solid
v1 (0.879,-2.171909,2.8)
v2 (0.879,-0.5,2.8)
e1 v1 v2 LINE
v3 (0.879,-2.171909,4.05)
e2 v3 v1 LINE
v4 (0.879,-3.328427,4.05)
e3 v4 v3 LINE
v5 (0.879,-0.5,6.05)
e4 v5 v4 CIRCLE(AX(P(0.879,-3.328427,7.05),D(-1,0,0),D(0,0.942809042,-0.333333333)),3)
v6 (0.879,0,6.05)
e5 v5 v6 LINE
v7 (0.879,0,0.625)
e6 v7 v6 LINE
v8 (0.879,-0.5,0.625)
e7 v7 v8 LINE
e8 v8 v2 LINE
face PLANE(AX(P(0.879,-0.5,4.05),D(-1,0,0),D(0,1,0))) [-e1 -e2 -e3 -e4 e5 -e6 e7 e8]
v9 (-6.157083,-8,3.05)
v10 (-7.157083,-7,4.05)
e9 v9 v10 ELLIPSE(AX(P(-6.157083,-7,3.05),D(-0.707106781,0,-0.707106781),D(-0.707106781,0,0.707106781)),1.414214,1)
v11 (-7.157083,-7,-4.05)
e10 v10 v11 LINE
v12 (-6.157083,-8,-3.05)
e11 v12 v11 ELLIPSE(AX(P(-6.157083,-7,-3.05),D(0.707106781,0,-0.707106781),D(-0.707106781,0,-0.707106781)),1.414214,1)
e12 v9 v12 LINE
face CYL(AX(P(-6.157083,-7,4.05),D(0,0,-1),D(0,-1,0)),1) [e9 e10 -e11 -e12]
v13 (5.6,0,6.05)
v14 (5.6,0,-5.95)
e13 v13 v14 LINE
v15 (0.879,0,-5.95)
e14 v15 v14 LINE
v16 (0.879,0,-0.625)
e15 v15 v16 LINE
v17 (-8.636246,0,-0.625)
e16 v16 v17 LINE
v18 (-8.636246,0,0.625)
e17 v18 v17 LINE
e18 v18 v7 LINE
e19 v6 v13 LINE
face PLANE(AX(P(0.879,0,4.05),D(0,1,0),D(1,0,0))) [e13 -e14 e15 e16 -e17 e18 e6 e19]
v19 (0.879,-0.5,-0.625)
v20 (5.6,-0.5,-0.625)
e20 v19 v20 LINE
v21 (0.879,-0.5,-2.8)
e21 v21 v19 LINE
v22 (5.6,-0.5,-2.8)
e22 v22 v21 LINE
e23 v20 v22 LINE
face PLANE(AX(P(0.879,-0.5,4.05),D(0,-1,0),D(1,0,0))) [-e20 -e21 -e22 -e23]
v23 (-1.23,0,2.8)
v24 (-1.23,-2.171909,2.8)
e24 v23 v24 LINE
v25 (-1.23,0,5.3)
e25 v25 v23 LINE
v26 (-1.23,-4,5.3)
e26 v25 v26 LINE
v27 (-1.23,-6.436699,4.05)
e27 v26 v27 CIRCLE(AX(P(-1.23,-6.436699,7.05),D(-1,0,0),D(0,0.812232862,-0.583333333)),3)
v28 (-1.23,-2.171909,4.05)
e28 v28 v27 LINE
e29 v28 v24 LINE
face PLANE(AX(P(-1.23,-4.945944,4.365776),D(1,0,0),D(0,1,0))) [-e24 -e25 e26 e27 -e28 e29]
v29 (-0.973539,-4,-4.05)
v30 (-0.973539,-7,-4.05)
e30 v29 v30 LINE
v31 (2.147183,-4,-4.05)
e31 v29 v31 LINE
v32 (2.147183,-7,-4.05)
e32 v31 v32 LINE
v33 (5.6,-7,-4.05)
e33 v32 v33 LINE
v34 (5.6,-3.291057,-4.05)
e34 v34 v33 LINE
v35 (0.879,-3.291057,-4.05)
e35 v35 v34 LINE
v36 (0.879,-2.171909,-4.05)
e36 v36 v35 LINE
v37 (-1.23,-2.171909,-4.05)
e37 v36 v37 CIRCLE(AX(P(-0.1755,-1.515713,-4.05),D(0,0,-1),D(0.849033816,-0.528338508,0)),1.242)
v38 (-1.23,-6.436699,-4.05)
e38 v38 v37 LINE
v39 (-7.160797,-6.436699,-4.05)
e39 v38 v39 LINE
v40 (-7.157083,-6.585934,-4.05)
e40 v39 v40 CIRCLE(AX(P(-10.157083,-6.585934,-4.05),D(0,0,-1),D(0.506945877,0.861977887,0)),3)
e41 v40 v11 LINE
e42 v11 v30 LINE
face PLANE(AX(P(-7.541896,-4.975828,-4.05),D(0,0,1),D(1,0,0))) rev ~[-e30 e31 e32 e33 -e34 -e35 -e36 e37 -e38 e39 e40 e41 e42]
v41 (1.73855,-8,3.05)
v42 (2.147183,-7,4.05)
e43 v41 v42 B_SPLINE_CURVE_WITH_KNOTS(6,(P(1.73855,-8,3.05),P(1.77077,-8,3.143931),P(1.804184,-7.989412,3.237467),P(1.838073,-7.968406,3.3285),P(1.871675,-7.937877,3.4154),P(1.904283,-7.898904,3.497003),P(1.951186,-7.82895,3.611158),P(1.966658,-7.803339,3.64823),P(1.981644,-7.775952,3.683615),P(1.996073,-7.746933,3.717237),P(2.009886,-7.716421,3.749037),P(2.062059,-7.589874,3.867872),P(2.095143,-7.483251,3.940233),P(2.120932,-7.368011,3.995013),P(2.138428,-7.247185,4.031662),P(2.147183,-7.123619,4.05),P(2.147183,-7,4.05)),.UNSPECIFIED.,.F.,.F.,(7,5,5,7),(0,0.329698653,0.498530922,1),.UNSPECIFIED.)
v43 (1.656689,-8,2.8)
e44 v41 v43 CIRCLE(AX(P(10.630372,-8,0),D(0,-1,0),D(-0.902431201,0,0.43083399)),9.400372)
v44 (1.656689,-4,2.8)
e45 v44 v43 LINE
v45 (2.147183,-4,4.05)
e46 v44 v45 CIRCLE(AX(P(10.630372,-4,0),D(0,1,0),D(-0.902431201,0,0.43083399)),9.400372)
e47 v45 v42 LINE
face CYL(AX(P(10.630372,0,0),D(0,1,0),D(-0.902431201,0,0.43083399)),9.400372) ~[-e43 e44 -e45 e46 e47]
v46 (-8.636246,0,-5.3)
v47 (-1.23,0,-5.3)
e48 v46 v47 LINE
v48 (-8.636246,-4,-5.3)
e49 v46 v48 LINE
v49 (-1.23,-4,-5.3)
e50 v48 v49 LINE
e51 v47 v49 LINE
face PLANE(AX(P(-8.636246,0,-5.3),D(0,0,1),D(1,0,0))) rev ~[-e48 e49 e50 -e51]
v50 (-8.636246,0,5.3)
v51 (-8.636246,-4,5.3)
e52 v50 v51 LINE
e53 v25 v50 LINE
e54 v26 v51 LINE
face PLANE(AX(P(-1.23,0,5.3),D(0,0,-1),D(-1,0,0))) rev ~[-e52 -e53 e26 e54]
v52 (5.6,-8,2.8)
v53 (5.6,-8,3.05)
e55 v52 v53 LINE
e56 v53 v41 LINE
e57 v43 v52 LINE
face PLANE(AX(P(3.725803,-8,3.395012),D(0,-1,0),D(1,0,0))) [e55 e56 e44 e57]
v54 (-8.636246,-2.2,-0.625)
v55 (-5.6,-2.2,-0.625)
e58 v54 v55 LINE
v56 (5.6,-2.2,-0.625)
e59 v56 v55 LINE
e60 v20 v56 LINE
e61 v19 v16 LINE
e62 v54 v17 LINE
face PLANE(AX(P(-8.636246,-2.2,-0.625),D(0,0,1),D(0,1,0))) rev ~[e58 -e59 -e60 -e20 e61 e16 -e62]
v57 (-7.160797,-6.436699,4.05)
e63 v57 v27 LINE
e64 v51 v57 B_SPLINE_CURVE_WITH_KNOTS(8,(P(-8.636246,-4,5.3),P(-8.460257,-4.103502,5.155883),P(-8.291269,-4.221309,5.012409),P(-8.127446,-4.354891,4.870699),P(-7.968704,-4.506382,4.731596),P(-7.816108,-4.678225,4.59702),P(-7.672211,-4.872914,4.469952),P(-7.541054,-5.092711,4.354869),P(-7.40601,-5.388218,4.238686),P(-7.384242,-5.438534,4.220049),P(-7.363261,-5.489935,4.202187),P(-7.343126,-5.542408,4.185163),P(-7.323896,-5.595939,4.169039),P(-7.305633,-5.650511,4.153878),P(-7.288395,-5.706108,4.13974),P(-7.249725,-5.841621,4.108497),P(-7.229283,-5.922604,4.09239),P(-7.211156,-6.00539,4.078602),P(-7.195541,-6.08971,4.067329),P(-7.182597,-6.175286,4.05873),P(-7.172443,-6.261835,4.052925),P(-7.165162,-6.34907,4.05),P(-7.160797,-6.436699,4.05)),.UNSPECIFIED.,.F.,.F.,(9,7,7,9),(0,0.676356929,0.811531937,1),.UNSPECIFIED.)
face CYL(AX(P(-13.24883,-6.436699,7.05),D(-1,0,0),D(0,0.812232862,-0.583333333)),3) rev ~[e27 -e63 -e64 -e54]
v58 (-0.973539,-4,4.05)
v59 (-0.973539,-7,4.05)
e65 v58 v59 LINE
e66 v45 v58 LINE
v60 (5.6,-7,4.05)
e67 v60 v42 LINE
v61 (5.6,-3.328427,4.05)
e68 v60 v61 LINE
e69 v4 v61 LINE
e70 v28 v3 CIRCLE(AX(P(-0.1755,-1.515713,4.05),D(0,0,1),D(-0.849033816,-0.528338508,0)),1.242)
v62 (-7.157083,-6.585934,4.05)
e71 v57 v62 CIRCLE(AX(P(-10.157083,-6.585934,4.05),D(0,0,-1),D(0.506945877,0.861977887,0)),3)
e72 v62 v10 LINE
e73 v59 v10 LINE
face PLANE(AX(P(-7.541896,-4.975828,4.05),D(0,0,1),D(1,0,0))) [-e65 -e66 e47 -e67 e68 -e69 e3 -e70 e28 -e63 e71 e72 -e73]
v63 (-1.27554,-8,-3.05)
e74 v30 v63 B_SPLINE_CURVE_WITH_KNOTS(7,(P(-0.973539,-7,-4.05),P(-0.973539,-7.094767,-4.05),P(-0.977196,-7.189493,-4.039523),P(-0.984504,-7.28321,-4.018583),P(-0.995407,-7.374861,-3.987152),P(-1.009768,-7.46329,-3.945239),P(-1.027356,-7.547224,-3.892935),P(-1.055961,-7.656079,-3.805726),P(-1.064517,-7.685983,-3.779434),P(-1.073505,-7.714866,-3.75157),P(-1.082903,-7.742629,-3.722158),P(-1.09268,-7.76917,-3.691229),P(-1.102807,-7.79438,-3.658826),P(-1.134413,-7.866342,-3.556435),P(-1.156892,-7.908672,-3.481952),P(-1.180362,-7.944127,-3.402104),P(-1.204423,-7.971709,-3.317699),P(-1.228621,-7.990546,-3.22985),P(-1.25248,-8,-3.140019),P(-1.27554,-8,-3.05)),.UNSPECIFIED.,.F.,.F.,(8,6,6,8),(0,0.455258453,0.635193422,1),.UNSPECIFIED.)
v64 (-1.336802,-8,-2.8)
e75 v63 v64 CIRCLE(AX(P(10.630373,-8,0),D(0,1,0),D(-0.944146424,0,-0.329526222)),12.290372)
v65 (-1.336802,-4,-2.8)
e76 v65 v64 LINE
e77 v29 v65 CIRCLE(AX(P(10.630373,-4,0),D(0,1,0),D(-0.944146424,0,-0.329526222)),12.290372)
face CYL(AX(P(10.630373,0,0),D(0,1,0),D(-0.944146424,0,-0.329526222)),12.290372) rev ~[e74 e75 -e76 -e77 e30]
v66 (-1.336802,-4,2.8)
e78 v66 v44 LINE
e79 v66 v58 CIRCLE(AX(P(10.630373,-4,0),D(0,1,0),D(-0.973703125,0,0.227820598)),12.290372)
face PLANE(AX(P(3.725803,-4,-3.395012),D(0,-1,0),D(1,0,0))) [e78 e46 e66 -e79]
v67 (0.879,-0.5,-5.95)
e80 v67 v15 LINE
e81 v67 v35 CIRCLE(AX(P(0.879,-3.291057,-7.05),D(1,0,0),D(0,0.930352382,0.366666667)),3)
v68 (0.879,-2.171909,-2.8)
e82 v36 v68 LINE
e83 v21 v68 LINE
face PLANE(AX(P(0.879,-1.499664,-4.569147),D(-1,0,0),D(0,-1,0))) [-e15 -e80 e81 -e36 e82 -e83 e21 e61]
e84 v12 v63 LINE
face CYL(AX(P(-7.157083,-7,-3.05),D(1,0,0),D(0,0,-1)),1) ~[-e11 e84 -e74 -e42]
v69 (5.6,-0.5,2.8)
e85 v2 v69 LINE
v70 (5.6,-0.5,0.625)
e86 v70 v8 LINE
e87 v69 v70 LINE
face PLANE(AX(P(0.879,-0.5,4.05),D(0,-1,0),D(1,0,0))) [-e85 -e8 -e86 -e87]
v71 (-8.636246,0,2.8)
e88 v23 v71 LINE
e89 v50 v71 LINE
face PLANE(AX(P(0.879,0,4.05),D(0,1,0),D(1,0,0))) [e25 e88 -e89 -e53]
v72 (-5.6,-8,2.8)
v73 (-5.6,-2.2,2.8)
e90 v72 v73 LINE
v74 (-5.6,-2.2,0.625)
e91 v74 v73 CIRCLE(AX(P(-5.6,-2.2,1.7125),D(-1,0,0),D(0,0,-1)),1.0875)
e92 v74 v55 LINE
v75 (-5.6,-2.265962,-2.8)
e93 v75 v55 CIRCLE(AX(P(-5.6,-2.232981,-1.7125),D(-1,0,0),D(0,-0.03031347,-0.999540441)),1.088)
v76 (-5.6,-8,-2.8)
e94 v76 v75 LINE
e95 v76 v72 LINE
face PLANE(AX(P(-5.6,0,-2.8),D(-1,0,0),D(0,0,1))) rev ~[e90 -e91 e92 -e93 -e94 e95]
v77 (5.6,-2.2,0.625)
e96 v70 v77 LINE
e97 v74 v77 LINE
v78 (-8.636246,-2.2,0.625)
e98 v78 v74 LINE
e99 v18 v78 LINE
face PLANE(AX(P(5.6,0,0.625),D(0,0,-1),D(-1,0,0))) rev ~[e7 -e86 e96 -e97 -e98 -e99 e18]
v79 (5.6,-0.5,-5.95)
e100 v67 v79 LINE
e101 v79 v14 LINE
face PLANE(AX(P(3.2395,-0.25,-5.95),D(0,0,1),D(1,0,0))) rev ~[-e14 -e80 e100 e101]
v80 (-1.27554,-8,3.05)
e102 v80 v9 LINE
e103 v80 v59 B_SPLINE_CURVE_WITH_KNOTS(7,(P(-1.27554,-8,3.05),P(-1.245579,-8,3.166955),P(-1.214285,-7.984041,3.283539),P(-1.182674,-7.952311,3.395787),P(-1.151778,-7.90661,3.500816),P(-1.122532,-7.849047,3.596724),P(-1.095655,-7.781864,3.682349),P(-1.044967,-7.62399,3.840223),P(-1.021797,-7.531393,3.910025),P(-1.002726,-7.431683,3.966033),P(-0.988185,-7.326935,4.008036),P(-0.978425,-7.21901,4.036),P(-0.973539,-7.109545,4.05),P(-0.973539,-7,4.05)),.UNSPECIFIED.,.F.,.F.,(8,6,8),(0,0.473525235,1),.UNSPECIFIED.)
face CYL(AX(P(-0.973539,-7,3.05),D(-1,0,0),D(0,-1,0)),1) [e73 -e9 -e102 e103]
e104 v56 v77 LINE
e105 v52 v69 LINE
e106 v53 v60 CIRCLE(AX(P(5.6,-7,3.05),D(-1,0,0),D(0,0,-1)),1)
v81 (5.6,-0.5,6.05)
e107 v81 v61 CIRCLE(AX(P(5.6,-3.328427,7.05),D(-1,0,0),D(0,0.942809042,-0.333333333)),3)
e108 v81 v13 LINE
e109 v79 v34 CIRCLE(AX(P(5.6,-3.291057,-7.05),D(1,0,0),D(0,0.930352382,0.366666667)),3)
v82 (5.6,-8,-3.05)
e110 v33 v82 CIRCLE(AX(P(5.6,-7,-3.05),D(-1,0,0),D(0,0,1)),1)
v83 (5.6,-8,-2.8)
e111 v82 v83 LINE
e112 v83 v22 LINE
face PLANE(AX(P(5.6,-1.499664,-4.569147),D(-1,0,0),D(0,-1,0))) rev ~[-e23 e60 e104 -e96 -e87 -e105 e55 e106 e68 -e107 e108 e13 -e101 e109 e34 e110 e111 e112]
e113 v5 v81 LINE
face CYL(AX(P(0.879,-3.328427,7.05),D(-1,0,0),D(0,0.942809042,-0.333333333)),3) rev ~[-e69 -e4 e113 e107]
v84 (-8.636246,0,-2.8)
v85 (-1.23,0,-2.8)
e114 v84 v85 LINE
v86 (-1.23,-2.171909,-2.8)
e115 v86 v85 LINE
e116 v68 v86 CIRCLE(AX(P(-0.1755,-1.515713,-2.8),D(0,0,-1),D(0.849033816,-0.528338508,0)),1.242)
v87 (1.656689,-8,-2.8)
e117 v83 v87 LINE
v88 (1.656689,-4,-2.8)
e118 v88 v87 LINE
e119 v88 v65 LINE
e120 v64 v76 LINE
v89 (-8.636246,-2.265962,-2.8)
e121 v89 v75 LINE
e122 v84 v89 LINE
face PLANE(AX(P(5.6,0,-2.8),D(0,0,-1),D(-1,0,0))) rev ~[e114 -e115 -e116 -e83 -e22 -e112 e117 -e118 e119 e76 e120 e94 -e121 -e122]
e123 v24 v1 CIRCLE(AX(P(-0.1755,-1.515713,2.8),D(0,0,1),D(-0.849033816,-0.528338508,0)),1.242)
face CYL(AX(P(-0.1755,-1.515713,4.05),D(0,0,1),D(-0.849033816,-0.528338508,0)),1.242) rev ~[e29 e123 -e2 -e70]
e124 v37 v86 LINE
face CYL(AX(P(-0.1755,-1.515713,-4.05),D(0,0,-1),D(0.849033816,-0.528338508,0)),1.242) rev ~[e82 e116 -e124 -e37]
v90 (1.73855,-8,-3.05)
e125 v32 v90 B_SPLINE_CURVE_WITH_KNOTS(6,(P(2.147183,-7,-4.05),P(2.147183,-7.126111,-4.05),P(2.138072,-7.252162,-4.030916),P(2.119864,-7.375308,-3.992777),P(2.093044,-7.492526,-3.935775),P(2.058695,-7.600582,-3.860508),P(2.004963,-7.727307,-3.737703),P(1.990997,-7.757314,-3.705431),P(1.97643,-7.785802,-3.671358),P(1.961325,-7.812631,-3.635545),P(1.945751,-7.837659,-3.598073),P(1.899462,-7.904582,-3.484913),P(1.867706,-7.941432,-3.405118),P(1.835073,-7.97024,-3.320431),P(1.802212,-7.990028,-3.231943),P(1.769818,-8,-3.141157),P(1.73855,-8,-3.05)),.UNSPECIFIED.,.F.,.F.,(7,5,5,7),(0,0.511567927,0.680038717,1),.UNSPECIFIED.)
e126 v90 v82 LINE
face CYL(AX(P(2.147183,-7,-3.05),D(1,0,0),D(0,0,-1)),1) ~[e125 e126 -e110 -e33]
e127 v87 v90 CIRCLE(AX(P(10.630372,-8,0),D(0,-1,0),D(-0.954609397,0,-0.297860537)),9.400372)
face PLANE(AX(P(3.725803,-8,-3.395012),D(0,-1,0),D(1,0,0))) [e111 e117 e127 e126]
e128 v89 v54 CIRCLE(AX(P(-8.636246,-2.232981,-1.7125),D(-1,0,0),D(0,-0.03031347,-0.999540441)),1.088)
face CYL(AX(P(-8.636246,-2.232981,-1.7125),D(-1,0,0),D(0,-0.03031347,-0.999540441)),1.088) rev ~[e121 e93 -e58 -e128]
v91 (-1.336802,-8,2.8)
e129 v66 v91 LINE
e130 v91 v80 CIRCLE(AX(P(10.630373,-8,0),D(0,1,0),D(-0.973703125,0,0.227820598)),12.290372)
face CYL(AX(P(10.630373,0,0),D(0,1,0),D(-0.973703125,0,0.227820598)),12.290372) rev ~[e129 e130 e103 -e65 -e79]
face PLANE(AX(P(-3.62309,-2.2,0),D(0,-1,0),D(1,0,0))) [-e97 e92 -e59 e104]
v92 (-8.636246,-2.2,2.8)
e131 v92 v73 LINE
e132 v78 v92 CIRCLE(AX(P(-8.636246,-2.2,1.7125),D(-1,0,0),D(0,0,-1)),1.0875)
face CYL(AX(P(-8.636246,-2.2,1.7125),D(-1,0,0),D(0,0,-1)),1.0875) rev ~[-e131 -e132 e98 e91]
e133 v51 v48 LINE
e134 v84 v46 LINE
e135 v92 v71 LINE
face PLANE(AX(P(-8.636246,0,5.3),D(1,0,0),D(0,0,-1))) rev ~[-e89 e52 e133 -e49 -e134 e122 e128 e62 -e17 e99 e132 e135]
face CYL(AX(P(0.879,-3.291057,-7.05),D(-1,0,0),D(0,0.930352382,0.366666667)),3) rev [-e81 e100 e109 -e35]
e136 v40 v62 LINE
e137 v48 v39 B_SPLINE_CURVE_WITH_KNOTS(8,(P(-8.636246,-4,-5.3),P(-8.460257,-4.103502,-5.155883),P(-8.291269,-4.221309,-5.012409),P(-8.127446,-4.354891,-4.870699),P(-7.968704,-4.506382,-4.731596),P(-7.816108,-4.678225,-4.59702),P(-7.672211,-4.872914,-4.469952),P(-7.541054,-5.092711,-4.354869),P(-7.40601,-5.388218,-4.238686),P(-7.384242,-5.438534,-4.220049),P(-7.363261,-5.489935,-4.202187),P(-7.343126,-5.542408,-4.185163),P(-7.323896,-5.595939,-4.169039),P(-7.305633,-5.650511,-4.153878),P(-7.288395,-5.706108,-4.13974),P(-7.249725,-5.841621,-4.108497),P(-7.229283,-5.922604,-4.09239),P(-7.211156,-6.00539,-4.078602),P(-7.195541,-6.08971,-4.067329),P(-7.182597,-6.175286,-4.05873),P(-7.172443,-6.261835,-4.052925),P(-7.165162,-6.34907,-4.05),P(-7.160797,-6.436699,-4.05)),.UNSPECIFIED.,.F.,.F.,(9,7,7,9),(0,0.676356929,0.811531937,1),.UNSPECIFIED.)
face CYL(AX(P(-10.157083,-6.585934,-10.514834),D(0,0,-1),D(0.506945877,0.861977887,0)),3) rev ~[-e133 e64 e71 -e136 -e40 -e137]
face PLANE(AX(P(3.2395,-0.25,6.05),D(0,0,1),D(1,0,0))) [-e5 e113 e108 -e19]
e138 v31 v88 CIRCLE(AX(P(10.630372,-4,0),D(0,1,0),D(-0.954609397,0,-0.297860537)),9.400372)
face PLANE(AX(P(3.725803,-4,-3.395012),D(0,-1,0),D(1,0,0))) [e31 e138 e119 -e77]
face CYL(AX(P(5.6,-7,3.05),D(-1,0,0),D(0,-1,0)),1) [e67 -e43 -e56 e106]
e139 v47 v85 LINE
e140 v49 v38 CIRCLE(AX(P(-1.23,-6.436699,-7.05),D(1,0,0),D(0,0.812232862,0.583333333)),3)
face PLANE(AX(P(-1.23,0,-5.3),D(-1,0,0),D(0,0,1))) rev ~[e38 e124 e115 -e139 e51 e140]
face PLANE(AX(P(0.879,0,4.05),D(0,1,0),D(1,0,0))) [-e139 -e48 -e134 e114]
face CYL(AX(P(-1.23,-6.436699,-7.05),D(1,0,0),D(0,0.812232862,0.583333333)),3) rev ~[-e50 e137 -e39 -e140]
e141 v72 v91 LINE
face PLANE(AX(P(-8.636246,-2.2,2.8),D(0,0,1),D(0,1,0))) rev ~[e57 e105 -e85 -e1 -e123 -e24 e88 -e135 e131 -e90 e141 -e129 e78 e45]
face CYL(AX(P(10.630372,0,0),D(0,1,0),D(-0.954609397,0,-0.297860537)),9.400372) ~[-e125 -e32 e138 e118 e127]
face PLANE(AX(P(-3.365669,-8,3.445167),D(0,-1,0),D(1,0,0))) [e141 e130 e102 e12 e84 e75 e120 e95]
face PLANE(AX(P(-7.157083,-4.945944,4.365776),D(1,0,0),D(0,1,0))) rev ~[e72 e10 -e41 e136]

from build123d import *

# Parameters (mm, degrees)
F1_DEPTH      = 2.2
F2_DEPTH      = 4
F3_DEPTH      = 8
F5_W          = 4.721
F5_H          = 0.5
F6_DEPTH      = 2
F6_DEPTH_BACK = 10
F7_DEPTH      = 4
F8_T1_DEPTH   = 5.9270831351
F8_T3_DEPTH   = 8.1
F8_T5_DEPTH   = 4.721
F8_T11_DEPTH  = 12.0188296006
F8_T16_DEPTH  = 14.5648341529
F8_T24_DEPTH  = 14.5648341529
F8_T29_DEPTH  = 12.0188296006
F10_DEPTH     = 1.5
F12_DEPTH     = 2
F13_R         = 1


# Not quite as in the source:
# - a fillet or chamfer that OpenCascade refuses, or shapes differently, is made with other operations: its cross-section is extruded or revolved along the edge and cut away or added


with BuildPart() as f1:
    # F0 (on Front) → F1 (new body)
    with BuildSketch(Plane.XZ):
        with BuildLine():
            Line((-1.6440981598, 0.625), (-5.6, 0.625))
            Line((-5.6, 0.625), (-5.6, -0.625))
            Line((-5.6, -0.625), (-1.6440981598, -0.625))
            ThreePointArc((-1.6440981598, -0.625), (-1.6599999508, 0), (-1.6440981598, 0.625))
        make_face()
        with BuildLine():
            Line((-1.23, 0.625), (-1.6440981598, 0.625))
            ThreePointArc((-1.6440981598, 0.625), (-1.6599999508, 0), (-1.6440981598, -0.625))
            Line((-1.6440981598, -0.625), (-1.23, -0.625))
            Line((-1.23, -0.625), (1.2508001143, -0.625))
            ThreePointArc((1.2508001143, -0.625), (1.23, 0), (1.2508001143, 0.625))
            Line((1.2508001143, 0.625), (-1.23, 0.625))
        make_face()
        with BuildLine():
            Line((1.6420518568, 0.625), (1.2508001143, 0.625))
            ThreePointArc((1.2508001143, 0.625), (1.23, 0), (1.2508001143, -0.625))
            Line((1.2508001143, -0.625), (1.6420518568, -0.625))
            Line((1.6420518568, -0.625), (5.6, -0.625))
            Line((5.6, -0.625), (5.6, 0.625))
            Line((5.6, 0.625), (1.6420518568, 0.625))
        make_face()
    extrude(amount=F1_DEPTH)

    # F0 (on Front) → F2 (join)
    with BuildSketch(Plane.XZ):
        with BuildLine():
            Line((5.6, -2.8), (1.6566885771, -2.8))
            ThreePointArc((1.6566885771, -2.8), (1.8795878526, -3.4337692421), (2.1471830551, -4.05))
            Line((2.1471830551, -4.05), (5.6, -4.05))
            Line((5.6, -4.05), (5.6, -2.8))
        make_face()
        with BuildLine():
            Line((-1.23, -2.8), (-1.3368015602, -2.8))
            ThreePointArc((-1.3368015602, -2.8), (-1.1717307029, -3.4298126738), (-0.9735386938, -4.05))
            Line((-0.9735386938, -4.05), (0.8789681604, -4.05))
            Line((0.8789681604, -4.05), (2.1471830551, -4.05))
            ThreePointArc((2.1471830551, -4.05), (1.8795878526, -3.4337692421), (1.6566885771, -2.8))
            Line((1.6566885771, -2.8), (1.23, -2.8))
            Line((1.23, -2.8), (-1.23, -2.8))
        make_face()
        with BuildLine():
            Line((-1.735931594, -2.8), (-5.6, -2.8))
            Line((-5.6, -2.8), (-5.6, -4.05))
            Line((-5.6, -4.05), (-2.3307385194, -4.05))
            Line((-2.3307385194, -4.05), (-1.23, -4.05))
            Line((-1.23, -4.05), (-0.9735386938, -4.05))
            ThreePointArc((-0.9735386938, -4.05), (-1.1717307029, -3.4298126738), (-1.3368015602, -2.8))
            Line((-1.3368015602, -2.8), (-1.735931594, -2.8))
        make_face()
        Polygon((-7.1570831351, 4.05), (-5.6, 4.05), (-2.3307385194, 4.05), (-1.23, 4.05), (-1.23, 5.3), (-8.636245504, 5.3), (-8.636245504, -5.3), (-1.23, -5.3), (-1.23, -4.05), (-2.3307385194, -4.05), (-5.6, -4.05), (-7.1570831351, -4.05), align=None)
        Polygon((-5.6, -0.625), (-5.6, 0.625), (-5.6, 2.8), (-5.6, 4.05), (-7.1570831351, 4.05), (-7.1570831351, -4.05), (-5.6, -4.05), (-5.6, -2.8), align=None)
        with BuildLine():
            Line((-5.6, 4.05), (-5.6, 2.8))
            Line((-5.6, 2.8), (-1.735931594, 2.8))
            Line((-1.735931594, 2.8), (-1.3368015602, 2.8))
            ThreePointArc((-1.3368015602, 2.8), (-1.1717307029, 3.4298126738), (-0.9735386938, 4.05))
            Line((-0.9735386938, 4.05), (-1.23, 4.05))
            Line((-1.23, 4.05), (-2.3307385194, 4.05))
            Line((-2.3307385194, 4.05), (-5.6, 4.05))
        make_face()
        with BuildLine():
            ThreePointArc((-0.9735386938, 4.05), (-1.1717307029, 3.4298126738), (-1.3368015602, 2.8))
            Line((-1.3368015602, 2.8), (1.23, 2.8))
            Line((1.23, 2.8), (1.2939187969, 2.8))
            Line((1.2939187969, 2.8), (1.6566885771, 2.8))
            ThreePointArc((1.6566885771, 2.8), (1.8795878526, 3.4337692421), (2.1471830551, 4.05))
            Line((2.1471830551, 4.05), (0.8789681604, 4.05))
            Line((0.8789681604, 4.05), (-0.9735386938, 4.05))
        make_face()
        with BuildLine():
            ThreePointArc((2.1471830551, 4.05), (1.8795878526, 3.4337692421), (1.6566885771, 2.8))
            Line((1.6566885771, 2.8), (5.6, 2.8))
            Line((5.6, 2.8), (5.6, 4.05))
            Line((5.6, 4.05), (2.1471830551, 4.05))
        make_face()
    extrude(amount=F2_DEPTH)

    # F0 (on Front) → F3 (join)
    with BuildSketch(Plane.XZ):
        with BuildLine():
            ThreePointArc((2.1471830551, 4.05), (1.8795878526, 3.4337692421), (1.6566885771, 2.8))
            Line((1.6566885771, 2.8), (5.6, 2.8))
            Line((5.6, 2.8), (5.6, 4.05))
            Line((5.6, 4.05), (2.1471830551, 4.05))
        make_face()
        with BuildLine():
            Line((-5.6, 4.05), (-5.6, 2.8))
            Line((-5.6, 2.8), (-1.735931594, 2.8))
            Line((-1.735931594, 2.8), (-1.3368015602, 2.8))
            ThreePointArc((-1.3368015602, 2.8), (-1.1717307029, 3.4298126738), (-0.9735386938, 4.05))
            Line((-0.9735386938, 4.05), (-1.23, 4.05))
            Line((-1.23, 4.05), (-2.3307385194, 4.05))
            Line((-2.3307385194, 4.05), (-5.6, 4.05))
        make_face()
        Polygon((-5.6, -0.625), (-5.6, 0.625), (-5.6, 2.8), (-5.6, 4.05), (-7.1570831351, 4.05), (-7.1570831351, -4.05), (-5.6, -4.05), (-5.6, -2.8), align=None)
        with BuildLine():
            Line((-1.735931594, -2.8), (-5.6, -2.8))
            Line((-5.6, -2.8), (-5.6, -4.05))
            Line((-5.6, -4.05), (-2.3307385194, -4.05))
            Line((-2.3307385194, -4.05), (-1.23, -4.05))
            Line((-1.23, -4.05), (-0.9735386938, -4.05))
            ThreePointArc((-0.9735386938, -4.05), (-1.1717307029, -3.4298126738), (-1.3368015602, -2.8))
            Line((-1.3368015602, -2.8), (-1.735931594, -2.8))
        make_face()
        with BuildLine():
            Line((5.6, -2.8), (1.6566885771, -2.8))
            ThreePointArc((1.6566885771, -2.8), (1.8795878526, -3.4337692421), (2.1471830551, -4.05))
            Line((2.1471830551, -4.05), (5.6, -4.05))
            Line((5.6, -4.05), (5.6, -2.8))
        make_face()
    extrude(amount=F3_DEPTH)

    # F5 (on face) → F6 (join, two sides)
    with BuildSketch(Plane.XY.offset(4.05)) as f6_sk:
        with Locations((3.2395, -0.25)):
            Rectangle(F5_W, F5_H)
    extrude(amount=F6_DEPTH)
    extrude(f6_sk.sketch, amount=-F6_DEPTH_BACK)

    # F4 (on face) → F7 (cut)
    with BuildSketch(Plane(origin=(-8.636245504, 0, 0), x_dir=(0, -1, 0), z_dir=(-1, 0, 0))):
        with BuildLine():
            ThreePointArc((2.2, 0.625), (3.2875, 1.7125), (2.2, 2.8))
            Line((2.2, 2.8), (0, 2.8))
            Line((0, 2.8), (0, 0.625))
            Line((0, 0.625), (2.2, 0.625))
        make_face()
        with BuildLine():
            ThreePointArc((2.2659621103, -2.8), (3.3204810552, -1.6795189448), (2.2, -0.625))
            Line((2.2, -0.625), (0, -0.625))
            Line((0, -0.625), (0, -2.8))
            Line((0, -2.8), (2.2, -2.8))
            Line((2.2, -2.8), (2.2659621103, -2.8))
        make_face()
    extrude(amount=-F7_DEPTH, mode=Mode.SUBTRACT)

    # F8: fillet of radius 3 on 5 edges, made by hand

    # F8_s2 → F8_t1 (join)
    with BuildSketch(Plane.YZ.offset(-7.1570831351)):
        with BuildLine():
            ThreePointArc((-4, 5.3), (-5.0673921924, 4.380730437), (-6.4366985862, 4.05))
            Line((-6.4366985862, 4.05), (-4, 4.05))
            Line((-4, 4.05), (-4, 5.3))
        make_face()
        with BuildLine():
            ThreePointArc((-4, -5.3), (-5.0673921924, -4.380730437), (-6.4366985862, -4.05))
            Line((-6.4366985862, -4.05), (-4, -4.05))
            Line((-4, -4.05), (-4, -5.3))
        make_face()
    extrude(amount=F8_T1_DEPTH)

    # F8_s4 → F8_t3 (join)
    with BuildSketch(Plane.XY.offset(-4.05)):
        with BuildLine():
            ThreePointArc((-8.636245504, -4), (-7.5529985653, -5.0963889141), (-7.1570831351, -6.5859336612))
            Line((-7.1570831351, -6.5859336612), (-7.1570831351, -4))
            Line((-7.1570831351, -4), (-8.636245504, -4))
        make_face()
    extrude(amount=F8_T3_DEPTH)

    # F8_s6 → F8_t5 (join)
    with BuildSketch(Plane.YZ.offset(0.879)):
        with BuildLine():
            ThreePointArc((-0.5, -5.95), (-1.6028628458, -4.5700806465), (-3.2910571474, -4.05))
            Line((-3.2910571474, -4.05), (-0.5, -4.05))
            Line((-0.5, -4.05), (-0.5, -5.95))
        make_face()
        with BuildLine():
            ThreePointArc((-0.5, 6.05), (-1.5963763172, 4.6005102572), (-3.3284271247, 4.05))
            Line((-3.3284271247, 4.05), (-0.5, 4.05))
            Line((-0.5, 4.05), (-0.5, 6.05))
        make_face()
    extrude(amount=F8_T5_DEPTH)


with BuildPart() as f8_tool9:
    # F8_s10 → F8_t11 (new body)
    with BuildSketch(Plane.YZ.offset(-13.2488296006)):
        with BuildLine():
            ThreePointArc((-4, 5.3), (-5.0673921924, 4.380730437), (-6.4366985862, 4.05))
            Line((-6.4366985862, 4.05), (-4, 4.05))
            Line((-4, 4.05), (-4, 5.3))
        make_face()
    extrude(amount=F8_T11_DEPTH)

    split(bisect_by=Plane.YZ.offset(-7.1570831351), keep=Keep.BOTTOM)

    split(bisect_by=Plane.YZ.offset(-8.636245504), keep=Keep.TOP)


with BuildPart() as f8_tool14:
    # F8_s15 → F8_t16 (new body)
    with BuildSketch(Plane.XY.offset(-4.05)):
        with BuildLine():
            ThreePointArc((-8.636245504, -4), (-7.5529985653, -5.0963889141), (-7.1570831351, -6.5859336612))
            Line((-7.1570831351, -6.5859336612), (-7.1570831351, -4))
            Line((-7.1570831351, -4), (-8.636245504, -4))
        make_face()
    extrude(amount=F8_T16_DEPTH)

    split(bisect_by=Plane.XY.offset(5.3), keep=Keep.BOTTOM)

    split(bisect_by=Plane.XY.offset(4.05), keep=Keep.TOP)


with BuildPart() as f8_tool9_1:
    add(f8_tool9.part)

    # F8_t19: intersect F8_tool14
    add(f8_tool14.part, mode=Mode.INTERSECT)


with BuildPart() as f1_1:
    add(f1.part)

    # F8_t7: union F8_tool9
    add(f8_tool9_1.part)


with BuildPart() as f8_tool22:
    # F8_s23 → F8_t24 (new body)
    with BuildSketch(Plane.XY.offset(-10.5148341529)):
        with BuildLine():
            ThreePointArc((-8.636245504, -4), (-7.5529985653, -5.0963889141), (-7.1570831351, -6.5859336612))
            Line((-7.1570831351, -6.5859336612), (-7.1570831351, -4))
            Line((-7.1570831351, -4), (-8.636245504, -4))
        make_face()
    extrude(amount=F8_T24_DEPTH)

    split(bisect_by=Plane.XY.offset(-5.3), keep=Keep.TOP)

    split(bisect_by=Plane.XY.offset(-4.05), keep=Keep.BOTTOM)


with BuildPart() as f8_tool27:
    # F8_s28 → F8_t29 (new body)
    with BuildSketch(Plane.YZ.offset(-1.23)):
        with BuildLine():
            ThreePointArc((-4, -5.3), (-5.0673921924, -4.380730437), (-6.4366985862, -4.05))
            Line((-6.4366985862, -4.05), (-4, -4.05))
            Line((-4, -4.05), (-4, -5.3))
        make_face()
    extrude(amount=-F8_T29_DEPTH)

    split(bisect_by=Plane.YZ.offset(-7.1570831351), keep=Keep.BOTTOM)

    split(bisect_by=Plane.YZ.offset(-8.636245504), keep=Keep.TOP)


with BuildPart() as f8_tool22_1:
    add(f8_tool22.part)

    # F8_t32: intersect F8_tool27
    add(f8_tool27.part, mode=Mode.INTERSECT)


with BuildPart() as f1_2:
    add(f1_1.part)

    # F8_t20: union F8_tool22
    add(f8_tool22_1.part)

    # F9 (on face) → F10 (cut)
    with BuildSketch(Plane.XY.offset(4.05)):
        with BuildLine():
            Line((-1.23, 0), (-1.23, -2.1719092038))
            ThreePointArc((-1.23, -2.1719092038), (-0.1755, -2.7577127774), (0.879, -2.1719092038))
            Line((0.879, -2.1719092038), (0.879, 0))
            Line((0.879, 0), (-1.23, 0))
        make_face()
    extrude(amount=-F10_DEPTH, mode=Mode.SUBTRACT)

    # F11 (on face) → F12 (cut)
    with BuildSketch(Plane(origin=(0, 0, -4.05), x_dir=(1, 0, 0), z_dir=(0, 0, -1))):
        with BuildLine():
            ThreePointArc((0.879, 2.1719092038), (-0.1755, 2.7577127774), (-1.23, 2.1719092038))
            Line((-1.23, 2.1719092038), (-1.23, 0))
            Line((-1.23, 0), (0.879, 0))
            Line((0.879, 0), (0.879, 0.5))
            Line((0.879, 0.5), (0.879, 2.1719092038))
        make_face()
    extrude(amount=-F12_DEPTH, mode=Mode.SUBTRACT)

    # F13
    f13_edges = [f1_2.edges().sort_by_distance(p)[0] for p in [
        (-4.065311, -8, 4.05),
        (-7.157083, -8, 0),
        (-4.065311, -8, -4.05),
        (3.873592, -8, -4.05),
        (3.873592, -8, 4.05),
    ]]
    fillet(f13_edges, radius=F13_R)


solid = f1_2.part
